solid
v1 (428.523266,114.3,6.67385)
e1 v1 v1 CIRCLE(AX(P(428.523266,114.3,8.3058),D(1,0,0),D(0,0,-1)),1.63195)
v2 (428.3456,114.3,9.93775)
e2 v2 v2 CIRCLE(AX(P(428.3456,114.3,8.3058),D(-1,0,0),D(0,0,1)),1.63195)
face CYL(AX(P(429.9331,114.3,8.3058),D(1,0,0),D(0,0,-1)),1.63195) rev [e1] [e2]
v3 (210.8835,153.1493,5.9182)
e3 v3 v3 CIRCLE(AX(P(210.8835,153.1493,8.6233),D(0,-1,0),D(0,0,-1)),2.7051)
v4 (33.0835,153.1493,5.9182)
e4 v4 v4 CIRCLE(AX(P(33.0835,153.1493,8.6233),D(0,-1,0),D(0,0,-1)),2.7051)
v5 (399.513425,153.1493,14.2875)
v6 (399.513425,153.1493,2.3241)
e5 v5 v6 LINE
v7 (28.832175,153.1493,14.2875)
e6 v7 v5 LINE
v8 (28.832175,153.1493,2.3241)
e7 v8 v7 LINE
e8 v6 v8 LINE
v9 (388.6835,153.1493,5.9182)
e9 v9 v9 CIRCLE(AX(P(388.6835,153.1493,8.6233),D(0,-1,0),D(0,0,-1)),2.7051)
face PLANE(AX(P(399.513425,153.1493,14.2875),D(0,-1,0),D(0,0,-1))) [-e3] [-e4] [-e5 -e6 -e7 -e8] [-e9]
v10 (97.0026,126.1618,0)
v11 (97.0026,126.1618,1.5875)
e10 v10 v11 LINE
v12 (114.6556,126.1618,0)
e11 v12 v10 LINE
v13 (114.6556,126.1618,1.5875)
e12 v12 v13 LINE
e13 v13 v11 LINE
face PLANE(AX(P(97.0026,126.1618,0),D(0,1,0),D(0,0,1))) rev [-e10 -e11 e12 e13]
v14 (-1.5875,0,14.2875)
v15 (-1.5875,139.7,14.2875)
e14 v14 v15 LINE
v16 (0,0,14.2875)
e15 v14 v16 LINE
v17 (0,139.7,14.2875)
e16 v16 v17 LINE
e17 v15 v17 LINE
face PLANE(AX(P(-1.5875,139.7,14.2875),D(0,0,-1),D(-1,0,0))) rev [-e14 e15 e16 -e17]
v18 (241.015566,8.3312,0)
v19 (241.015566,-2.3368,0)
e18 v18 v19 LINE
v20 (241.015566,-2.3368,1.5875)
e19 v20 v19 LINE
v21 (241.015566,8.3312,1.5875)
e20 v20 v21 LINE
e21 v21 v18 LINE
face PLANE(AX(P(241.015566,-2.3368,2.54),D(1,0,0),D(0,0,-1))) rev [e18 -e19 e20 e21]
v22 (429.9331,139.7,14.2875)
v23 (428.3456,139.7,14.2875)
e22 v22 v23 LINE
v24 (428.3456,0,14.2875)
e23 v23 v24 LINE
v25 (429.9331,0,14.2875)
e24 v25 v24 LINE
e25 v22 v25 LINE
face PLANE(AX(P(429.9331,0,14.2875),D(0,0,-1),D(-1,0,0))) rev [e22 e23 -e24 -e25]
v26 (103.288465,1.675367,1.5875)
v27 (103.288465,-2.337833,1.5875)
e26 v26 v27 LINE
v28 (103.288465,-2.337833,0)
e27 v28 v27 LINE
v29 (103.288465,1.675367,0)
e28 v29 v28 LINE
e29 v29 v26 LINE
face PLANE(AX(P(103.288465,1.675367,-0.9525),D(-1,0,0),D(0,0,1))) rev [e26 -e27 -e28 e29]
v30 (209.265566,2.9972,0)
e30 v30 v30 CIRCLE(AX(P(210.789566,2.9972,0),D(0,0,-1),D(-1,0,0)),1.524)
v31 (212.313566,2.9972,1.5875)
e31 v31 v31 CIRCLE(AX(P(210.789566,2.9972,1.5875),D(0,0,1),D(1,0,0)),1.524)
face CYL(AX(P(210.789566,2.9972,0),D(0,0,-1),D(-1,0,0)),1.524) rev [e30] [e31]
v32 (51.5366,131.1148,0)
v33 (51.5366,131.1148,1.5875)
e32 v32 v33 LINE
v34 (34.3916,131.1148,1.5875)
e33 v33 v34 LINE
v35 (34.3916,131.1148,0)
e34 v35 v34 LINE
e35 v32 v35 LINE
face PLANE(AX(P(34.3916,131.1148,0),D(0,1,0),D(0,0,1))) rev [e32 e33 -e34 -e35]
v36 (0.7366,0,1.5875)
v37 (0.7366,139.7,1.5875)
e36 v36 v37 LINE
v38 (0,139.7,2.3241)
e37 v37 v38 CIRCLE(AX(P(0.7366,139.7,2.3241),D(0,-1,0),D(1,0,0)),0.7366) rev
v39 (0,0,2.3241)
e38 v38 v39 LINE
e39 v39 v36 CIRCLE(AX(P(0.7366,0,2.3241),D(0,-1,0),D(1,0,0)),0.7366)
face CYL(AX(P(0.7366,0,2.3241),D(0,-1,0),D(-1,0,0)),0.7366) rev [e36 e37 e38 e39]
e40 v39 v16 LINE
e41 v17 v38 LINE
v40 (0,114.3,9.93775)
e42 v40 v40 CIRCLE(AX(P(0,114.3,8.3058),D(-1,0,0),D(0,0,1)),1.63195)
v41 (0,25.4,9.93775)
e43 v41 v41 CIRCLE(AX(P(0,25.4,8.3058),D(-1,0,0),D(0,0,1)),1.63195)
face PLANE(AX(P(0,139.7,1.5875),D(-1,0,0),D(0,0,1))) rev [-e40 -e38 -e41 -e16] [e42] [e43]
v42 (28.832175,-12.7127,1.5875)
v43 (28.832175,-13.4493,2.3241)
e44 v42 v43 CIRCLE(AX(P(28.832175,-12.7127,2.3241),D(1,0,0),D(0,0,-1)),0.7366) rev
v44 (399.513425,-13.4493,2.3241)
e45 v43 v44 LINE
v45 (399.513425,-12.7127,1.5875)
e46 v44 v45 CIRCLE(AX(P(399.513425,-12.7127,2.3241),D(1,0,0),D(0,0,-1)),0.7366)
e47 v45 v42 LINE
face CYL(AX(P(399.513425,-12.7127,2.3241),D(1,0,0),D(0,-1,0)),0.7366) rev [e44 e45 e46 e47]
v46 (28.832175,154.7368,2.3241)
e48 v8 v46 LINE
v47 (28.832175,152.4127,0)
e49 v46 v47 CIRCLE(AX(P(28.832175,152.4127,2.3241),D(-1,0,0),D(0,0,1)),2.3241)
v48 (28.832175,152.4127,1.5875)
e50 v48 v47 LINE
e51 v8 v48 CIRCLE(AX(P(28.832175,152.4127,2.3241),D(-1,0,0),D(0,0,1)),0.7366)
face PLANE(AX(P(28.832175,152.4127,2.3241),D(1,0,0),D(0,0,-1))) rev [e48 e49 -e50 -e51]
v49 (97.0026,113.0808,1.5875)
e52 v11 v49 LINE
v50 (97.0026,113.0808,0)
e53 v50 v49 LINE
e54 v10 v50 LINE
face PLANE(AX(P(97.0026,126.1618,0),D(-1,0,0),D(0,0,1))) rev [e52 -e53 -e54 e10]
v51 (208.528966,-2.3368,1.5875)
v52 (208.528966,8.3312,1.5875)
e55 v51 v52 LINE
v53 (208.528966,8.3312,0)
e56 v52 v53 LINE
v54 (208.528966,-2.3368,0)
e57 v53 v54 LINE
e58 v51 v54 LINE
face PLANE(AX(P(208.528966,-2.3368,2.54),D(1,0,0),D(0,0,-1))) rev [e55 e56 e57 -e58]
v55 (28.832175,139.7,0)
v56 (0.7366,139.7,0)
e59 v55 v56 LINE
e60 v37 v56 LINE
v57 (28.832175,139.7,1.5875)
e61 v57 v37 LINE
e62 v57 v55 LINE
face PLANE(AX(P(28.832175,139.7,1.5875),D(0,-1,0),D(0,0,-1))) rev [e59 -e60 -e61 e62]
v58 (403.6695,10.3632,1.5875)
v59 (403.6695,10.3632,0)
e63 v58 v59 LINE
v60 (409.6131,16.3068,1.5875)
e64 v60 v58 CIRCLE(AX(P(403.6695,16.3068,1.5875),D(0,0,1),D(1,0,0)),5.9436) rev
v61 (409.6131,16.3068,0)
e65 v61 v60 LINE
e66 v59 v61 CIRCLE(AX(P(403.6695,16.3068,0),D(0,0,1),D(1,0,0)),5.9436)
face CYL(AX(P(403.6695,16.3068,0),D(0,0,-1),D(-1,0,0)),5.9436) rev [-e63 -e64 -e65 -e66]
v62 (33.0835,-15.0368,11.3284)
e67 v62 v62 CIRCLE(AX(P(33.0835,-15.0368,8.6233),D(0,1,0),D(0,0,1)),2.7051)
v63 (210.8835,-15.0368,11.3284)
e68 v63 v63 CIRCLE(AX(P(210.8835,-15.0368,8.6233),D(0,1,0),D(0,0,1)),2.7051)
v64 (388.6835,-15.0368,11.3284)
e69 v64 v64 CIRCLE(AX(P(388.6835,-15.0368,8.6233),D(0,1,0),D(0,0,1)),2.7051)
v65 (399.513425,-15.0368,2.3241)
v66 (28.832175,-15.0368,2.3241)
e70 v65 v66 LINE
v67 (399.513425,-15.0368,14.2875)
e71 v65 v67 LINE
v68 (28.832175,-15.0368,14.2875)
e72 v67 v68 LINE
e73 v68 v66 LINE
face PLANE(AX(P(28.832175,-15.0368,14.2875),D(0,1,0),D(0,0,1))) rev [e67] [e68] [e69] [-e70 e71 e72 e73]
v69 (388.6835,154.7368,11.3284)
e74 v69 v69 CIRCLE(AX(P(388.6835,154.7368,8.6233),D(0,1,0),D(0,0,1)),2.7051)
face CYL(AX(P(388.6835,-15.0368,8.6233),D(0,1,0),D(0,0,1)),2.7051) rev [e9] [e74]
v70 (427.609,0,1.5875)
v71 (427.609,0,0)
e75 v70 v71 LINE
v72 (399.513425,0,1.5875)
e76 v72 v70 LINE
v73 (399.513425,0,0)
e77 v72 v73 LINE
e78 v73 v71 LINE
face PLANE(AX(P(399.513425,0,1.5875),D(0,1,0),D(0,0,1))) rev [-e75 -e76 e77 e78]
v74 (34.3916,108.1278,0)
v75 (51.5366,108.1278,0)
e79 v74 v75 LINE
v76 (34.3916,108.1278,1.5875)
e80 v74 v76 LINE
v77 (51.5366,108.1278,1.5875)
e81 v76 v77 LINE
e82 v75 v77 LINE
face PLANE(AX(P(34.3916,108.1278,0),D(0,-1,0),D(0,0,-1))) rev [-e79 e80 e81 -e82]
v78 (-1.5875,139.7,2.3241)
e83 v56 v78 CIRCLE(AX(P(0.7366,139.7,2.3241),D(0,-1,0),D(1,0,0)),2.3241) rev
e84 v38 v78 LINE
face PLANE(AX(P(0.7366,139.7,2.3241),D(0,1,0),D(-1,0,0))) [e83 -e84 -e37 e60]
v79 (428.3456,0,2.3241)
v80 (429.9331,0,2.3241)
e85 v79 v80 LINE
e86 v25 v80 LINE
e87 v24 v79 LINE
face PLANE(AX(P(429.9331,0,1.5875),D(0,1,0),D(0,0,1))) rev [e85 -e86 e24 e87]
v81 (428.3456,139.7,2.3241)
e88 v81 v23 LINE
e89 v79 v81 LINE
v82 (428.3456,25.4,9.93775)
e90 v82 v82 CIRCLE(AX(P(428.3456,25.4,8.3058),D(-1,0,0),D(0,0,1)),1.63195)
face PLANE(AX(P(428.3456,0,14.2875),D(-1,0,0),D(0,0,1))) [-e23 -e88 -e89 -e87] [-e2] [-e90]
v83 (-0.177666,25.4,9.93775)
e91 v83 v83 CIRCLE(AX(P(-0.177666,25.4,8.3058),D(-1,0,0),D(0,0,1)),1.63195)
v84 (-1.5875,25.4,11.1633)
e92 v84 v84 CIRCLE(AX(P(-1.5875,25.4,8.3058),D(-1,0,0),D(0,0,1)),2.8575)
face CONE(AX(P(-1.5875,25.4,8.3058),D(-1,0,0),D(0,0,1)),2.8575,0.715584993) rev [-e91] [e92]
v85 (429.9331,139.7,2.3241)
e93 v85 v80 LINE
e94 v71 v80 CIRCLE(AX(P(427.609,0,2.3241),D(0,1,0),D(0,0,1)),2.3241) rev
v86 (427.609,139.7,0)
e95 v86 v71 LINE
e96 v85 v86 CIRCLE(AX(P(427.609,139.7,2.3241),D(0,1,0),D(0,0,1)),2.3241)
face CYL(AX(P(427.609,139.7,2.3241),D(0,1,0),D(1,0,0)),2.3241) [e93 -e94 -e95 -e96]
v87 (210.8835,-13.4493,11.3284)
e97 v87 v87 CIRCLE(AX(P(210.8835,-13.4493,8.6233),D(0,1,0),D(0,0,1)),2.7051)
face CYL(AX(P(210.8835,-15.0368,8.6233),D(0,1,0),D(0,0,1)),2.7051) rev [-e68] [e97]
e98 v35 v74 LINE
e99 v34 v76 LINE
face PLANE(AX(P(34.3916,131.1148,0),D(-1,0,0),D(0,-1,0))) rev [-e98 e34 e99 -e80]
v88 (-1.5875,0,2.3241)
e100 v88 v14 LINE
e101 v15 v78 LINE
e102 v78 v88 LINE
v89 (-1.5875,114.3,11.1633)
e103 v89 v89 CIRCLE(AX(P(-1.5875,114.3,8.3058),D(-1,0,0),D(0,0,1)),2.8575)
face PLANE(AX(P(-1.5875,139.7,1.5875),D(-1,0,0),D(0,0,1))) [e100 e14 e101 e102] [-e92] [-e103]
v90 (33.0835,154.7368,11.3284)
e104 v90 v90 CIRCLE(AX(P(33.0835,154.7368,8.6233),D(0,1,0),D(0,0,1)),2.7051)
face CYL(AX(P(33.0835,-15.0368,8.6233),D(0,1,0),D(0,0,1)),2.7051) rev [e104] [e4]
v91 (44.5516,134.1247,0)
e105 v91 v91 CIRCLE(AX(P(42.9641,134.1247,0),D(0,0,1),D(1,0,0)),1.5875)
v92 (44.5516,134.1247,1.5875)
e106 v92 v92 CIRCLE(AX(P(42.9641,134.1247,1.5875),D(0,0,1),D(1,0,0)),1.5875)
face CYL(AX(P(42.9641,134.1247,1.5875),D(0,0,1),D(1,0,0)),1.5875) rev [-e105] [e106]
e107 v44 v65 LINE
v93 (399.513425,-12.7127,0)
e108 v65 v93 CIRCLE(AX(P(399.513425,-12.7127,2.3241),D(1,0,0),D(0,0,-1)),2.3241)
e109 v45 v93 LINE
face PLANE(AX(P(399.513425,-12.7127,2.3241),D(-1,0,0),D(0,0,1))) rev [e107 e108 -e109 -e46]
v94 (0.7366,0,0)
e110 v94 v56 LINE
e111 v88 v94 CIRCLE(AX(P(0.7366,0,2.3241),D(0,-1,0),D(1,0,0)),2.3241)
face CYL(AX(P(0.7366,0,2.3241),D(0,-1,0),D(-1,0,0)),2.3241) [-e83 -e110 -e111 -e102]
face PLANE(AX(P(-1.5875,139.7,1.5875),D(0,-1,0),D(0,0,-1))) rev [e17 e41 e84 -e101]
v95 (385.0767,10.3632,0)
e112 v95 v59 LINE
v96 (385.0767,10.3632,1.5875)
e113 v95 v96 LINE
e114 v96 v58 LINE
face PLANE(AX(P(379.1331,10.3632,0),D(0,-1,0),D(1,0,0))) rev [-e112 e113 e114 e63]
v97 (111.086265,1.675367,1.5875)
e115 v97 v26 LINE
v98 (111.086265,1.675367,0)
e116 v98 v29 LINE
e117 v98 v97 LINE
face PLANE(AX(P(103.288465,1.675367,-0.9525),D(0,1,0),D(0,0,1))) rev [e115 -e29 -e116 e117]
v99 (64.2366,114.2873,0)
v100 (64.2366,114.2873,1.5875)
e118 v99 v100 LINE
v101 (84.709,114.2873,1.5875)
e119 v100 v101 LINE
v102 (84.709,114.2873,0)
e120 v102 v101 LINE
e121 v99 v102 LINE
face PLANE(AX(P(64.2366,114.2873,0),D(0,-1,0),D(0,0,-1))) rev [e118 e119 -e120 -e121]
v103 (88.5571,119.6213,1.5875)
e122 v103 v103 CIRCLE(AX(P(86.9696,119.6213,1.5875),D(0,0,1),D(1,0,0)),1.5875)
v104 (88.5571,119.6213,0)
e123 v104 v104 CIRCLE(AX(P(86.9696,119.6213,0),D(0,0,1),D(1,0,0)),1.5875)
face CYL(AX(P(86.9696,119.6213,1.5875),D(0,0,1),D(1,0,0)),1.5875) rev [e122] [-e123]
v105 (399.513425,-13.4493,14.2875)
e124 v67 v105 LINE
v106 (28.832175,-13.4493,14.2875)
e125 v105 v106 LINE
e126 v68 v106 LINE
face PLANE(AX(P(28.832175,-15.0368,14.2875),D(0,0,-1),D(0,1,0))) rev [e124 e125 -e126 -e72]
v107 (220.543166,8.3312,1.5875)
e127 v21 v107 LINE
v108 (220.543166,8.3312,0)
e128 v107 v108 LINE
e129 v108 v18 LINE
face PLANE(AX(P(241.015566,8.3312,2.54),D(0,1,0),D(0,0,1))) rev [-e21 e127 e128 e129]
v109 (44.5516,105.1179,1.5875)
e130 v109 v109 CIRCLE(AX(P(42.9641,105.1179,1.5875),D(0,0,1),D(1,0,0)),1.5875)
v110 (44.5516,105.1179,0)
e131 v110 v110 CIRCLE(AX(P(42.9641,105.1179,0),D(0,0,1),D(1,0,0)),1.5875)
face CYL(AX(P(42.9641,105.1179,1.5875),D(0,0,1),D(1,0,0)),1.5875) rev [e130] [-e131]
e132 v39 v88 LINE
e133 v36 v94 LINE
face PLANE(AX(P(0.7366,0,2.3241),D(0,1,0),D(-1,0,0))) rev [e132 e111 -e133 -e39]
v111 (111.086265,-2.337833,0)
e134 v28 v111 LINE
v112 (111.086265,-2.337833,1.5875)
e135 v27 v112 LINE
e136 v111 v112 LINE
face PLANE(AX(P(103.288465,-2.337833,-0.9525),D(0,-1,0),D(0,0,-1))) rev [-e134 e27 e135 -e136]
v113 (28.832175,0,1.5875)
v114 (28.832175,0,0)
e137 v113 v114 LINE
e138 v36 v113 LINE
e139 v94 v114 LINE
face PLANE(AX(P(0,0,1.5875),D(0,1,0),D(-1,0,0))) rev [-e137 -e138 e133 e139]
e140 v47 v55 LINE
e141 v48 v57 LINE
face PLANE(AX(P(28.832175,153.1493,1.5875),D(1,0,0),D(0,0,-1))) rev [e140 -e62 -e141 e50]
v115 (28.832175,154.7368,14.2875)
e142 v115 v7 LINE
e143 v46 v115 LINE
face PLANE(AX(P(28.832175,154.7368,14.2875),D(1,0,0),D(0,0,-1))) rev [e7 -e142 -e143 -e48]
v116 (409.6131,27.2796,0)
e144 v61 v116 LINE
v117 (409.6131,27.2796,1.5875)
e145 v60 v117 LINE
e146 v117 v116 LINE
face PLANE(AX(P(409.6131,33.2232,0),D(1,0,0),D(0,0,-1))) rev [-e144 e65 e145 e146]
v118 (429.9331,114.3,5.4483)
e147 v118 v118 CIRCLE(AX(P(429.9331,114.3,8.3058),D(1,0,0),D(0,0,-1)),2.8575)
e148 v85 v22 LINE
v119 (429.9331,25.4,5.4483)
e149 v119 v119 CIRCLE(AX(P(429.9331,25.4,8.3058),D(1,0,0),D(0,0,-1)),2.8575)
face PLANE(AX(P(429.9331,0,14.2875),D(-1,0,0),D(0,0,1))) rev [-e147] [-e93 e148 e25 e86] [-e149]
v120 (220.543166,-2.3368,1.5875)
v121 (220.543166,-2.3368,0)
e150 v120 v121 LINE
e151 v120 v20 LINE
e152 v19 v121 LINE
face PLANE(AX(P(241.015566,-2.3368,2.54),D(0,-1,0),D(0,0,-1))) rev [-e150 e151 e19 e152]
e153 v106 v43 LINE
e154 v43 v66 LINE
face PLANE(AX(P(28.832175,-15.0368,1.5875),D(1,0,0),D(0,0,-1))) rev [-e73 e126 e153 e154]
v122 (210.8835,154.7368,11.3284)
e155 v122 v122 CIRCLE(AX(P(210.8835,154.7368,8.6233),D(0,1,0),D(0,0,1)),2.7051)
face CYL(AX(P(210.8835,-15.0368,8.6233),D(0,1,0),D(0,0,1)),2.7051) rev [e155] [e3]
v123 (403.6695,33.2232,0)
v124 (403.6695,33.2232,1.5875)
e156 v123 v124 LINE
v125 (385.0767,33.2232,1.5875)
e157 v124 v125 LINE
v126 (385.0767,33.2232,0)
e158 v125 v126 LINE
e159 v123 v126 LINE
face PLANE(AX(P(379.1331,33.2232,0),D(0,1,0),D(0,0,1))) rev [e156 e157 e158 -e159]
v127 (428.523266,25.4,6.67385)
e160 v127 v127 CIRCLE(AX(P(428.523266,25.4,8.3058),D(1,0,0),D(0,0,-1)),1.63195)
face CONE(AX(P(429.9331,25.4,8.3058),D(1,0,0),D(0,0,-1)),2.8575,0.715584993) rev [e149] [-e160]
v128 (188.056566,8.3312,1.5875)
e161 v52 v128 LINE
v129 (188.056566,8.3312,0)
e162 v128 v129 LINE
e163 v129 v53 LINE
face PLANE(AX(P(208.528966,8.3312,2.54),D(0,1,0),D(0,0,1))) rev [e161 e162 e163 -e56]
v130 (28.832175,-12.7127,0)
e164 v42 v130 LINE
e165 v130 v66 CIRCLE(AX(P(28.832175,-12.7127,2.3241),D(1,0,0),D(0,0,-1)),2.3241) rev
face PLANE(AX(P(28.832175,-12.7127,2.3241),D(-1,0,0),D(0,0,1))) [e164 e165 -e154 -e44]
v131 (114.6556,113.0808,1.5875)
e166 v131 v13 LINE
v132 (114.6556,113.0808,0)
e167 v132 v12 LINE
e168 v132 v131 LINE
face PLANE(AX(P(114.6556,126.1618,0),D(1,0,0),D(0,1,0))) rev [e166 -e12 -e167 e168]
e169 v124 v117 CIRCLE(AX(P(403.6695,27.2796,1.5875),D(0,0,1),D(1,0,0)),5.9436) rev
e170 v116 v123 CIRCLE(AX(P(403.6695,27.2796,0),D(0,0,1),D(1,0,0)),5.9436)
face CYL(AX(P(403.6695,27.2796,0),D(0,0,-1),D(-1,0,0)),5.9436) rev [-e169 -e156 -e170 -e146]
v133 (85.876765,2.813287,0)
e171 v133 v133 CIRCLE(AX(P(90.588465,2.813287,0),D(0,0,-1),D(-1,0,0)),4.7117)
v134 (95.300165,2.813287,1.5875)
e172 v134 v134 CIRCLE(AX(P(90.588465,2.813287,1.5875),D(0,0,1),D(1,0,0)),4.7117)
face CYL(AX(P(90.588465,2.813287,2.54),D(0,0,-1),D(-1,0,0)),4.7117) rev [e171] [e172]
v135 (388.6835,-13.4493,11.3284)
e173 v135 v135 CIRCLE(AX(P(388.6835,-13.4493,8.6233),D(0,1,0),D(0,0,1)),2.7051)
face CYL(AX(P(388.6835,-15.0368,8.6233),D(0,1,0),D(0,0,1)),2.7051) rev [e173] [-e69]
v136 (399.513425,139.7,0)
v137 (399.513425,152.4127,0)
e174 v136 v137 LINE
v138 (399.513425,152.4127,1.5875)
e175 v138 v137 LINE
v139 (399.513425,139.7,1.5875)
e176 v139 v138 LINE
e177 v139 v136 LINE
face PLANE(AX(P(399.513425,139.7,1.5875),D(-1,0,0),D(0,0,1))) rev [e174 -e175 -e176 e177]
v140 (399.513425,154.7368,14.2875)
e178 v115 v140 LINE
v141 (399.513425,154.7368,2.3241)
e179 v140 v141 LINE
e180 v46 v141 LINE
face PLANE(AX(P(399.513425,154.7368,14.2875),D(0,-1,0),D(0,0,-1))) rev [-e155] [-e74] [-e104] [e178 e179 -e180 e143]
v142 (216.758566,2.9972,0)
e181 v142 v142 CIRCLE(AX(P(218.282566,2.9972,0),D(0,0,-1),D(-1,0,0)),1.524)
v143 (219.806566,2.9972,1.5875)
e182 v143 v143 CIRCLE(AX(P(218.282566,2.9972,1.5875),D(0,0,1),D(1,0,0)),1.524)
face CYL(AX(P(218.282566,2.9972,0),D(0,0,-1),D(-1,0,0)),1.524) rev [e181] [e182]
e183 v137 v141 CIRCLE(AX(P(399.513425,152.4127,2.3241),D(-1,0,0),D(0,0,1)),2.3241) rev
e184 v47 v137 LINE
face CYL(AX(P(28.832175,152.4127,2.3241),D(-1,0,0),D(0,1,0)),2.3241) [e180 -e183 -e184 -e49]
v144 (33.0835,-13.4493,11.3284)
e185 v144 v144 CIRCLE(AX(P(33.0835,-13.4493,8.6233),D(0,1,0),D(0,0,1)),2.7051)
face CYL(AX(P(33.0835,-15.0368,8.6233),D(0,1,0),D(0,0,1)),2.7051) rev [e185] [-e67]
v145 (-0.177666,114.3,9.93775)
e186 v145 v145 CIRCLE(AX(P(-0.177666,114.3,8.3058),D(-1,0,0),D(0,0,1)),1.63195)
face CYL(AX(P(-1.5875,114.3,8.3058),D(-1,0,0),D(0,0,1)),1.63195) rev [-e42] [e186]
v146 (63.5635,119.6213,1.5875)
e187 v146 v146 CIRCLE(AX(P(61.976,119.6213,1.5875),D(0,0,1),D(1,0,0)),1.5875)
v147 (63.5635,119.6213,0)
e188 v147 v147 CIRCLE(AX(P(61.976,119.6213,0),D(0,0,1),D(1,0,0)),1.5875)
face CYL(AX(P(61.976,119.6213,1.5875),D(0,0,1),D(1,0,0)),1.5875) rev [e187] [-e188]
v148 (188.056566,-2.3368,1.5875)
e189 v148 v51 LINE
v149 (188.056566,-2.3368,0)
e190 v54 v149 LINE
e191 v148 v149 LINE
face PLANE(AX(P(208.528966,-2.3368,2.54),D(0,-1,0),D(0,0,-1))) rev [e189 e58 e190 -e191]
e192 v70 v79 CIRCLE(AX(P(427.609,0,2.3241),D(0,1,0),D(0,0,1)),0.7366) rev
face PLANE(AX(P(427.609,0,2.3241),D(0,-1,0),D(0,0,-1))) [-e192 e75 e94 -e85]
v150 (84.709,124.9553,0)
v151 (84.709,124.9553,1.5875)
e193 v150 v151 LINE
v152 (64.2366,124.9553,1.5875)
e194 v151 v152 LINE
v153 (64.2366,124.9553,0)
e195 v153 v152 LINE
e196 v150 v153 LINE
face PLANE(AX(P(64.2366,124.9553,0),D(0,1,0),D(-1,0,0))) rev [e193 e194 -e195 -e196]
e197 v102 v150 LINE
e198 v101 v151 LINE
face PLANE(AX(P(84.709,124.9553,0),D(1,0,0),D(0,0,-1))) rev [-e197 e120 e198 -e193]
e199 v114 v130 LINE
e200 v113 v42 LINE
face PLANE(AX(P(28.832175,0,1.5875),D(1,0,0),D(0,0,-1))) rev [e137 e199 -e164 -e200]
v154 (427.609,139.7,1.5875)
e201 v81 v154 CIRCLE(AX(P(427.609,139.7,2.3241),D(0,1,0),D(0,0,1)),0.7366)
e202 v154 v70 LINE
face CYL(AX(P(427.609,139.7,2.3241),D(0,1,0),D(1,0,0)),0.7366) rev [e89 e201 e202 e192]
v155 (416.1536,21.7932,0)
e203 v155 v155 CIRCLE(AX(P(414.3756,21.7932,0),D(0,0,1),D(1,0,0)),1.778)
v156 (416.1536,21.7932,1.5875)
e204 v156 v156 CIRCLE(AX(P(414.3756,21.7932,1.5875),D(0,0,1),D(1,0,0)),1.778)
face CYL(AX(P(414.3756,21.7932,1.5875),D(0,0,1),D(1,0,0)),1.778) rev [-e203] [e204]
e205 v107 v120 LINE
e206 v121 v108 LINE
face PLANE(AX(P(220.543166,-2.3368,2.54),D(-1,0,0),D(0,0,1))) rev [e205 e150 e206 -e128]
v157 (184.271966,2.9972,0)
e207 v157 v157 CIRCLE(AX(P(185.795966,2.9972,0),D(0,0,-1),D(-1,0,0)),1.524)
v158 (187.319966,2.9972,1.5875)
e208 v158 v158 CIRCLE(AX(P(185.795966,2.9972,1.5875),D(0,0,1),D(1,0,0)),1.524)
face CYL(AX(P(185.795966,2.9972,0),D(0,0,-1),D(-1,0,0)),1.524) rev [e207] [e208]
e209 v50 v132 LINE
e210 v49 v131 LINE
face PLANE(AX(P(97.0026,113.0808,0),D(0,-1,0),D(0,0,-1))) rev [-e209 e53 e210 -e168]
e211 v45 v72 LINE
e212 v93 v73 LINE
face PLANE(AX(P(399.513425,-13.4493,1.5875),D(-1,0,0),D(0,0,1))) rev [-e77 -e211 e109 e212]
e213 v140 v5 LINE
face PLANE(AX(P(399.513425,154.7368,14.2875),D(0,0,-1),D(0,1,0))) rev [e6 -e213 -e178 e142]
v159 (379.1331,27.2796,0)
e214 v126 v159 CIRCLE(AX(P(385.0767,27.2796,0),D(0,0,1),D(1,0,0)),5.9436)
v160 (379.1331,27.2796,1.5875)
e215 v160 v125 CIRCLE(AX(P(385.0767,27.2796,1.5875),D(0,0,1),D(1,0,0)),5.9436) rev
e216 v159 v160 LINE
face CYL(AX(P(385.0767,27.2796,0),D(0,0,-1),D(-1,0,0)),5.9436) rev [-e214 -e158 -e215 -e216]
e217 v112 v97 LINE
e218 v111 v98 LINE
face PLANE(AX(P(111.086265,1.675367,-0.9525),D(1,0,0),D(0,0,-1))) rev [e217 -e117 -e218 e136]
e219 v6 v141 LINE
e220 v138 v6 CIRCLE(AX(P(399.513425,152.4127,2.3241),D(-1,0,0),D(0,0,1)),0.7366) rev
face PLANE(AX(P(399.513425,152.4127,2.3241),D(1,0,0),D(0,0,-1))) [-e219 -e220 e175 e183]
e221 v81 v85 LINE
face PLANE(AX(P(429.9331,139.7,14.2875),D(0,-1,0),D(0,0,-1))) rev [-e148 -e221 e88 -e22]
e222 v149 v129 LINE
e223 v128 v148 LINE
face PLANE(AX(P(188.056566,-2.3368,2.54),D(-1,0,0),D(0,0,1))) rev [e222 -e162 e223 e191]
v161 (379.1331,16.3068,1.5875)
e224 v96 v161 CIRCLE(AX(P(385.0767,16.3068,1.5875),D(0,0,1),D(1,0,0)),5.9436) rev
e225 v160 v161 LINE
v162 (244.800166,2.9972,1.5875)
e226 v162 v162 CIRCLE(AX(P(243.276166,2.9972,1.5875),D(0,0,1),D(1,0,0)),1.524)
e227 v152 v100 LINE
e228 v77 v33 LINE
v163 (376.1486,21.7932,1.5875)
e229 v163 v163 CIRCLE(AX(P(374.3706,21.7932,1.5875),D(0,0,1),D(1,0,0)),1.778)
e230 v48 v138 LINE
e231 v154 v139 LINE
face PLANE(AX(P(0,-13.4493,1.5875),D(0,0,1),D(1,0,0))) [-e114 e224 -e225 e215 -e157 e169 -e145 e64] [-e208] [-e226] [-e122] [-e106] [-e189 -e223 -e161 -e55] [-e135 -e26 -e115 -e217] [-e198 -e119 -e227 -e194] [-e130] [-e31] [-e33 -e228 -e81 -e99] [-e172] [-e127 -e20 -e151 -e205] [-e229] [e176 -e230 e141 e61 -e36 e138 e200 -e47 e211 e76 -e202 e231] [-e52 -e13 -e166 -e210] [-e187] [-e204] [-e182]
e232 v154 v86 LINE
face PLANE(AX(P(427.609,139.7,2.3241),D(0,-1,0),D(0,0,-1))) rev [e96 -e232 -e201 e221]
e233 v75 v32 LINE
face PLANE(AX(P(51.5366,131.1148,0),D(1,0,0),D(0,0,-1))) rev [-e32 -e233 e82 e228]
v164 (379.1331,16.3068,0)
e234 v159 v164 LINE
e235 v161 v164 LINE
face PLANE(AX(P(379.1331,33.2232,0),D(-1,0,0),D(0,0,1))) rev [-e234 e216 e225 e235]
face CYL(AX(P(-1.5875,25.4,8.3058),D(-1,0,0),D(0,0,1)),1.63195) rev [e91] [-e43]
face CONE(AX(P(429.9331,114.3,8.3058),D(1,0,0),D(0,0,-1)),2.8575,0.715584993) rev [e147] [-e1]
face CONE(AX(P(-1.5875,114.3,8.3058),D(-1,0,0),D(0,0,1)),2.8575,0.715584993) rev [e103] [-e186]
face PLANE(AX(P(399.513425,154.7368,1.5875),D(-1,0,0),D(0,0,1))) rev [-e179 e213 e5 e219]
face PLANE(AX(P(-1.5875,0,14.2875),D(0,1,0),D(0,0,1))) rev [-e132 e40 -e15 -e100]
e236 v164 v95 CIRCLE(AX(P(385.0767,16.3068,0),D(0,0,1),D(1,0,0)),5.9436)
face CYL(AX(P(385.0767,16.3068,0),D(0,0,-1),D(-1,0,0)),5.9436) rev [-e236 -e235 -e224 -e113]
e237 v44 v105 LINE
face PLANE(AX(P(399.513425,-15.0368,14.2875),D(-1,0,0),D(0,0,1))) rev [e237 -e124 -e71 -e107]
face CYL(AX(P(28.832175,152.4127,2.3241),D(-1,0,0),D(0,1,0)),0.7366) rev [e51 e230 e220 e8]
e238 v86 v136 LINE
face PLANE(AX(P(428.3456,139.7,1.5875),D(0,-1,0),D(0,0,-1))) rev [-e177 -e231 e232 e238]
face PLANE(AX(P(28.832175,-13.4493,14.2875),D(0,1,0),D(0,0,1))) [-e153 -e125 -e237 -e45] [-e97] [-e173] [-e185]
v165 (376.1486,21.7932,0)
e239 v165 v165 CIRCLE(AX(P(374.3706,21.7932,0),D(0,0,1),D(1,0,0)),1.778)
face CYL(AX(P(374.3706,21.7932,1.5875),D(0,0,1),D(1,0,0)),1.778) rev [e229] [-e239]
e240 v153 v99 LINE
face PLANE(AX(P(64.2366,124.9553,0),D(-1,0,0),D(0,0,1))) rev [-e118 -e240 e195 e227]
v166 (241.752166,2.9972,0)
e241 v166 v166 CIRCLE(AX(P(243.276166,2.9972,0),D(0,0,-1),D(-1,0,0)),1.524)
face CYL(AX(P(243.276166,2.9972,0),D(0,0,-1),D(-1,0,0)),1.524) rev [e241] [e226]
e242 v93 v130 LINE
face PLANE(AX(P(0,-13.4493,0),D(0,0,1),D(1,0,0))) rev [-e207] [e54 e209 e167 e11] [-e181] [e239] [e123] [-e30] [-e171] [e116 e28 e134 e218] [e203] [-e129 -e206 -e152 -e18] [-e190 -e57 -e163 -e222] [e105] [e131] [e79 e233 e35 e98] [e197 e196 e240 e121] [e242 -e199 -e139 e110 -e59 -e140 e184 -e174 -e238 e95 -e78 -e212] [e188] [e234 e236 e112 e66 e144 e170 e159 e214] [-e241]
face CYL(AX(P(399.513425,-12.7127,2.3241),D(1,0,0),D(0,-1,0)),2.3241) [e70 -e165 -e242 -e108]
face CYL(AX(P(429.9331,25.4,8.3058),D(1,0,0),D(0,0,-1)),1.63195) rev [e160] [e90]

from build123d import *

# Parameters (mm, degrees)
BASE_FLANGE_DEPTH               = 1.5875
EDGE_FLANGE1_STRIP_W            = 7.8232
EDGE_FLANGE1_STRIP_H            = 1.5875
EDGE_FLANGE1_STRIP_CUT_DEPTH    = 139.7
EDGE_FLANGE1_DEPTH              = 139.7
EDGE_FLANGE2_STRIP_W            = 7.8232
EDGE_FLANGE2_STRIP_H            = 1.5875
EDGE_FLANGE2_STRIP_CUT_DEPTH    = 139.7
EDGE_FLANGE2_DEPTH              = 139.7
EDGE_FLANGE3_STRIP_W            = 7.8232
EDGE_FLANGE3_STRIP_H            = 1.5875
EDGE_FLANGE3_STRIP_CUT_DEPTH    = 370.68125
EDGE_FLANGE3_DEPTH              = 370.68125
EDGE_FLANGE4_STRIP_W            = 7.8232
EDGE_FLANGE4_STRIP_H            = 1.5875
EDGE_FLANGE4_STRIP_CUT_DEPTH    = 370.68125
EDGE_FLANGE4_DEPTH              = 370.68125
SKETCH15_W                      = 20.4724
SKETCH15_H                      = 10.668
CUT_EXTRUDE1_DEPTH              = 458.107468491
SKETCH16_W                      = 17.653
SKETCH16_H                      = 13.081
CUT_EXTRUDE2_DEPTH              = 458.107468491
F_1_8_0_125_DIAMETER_HOLE1_D    = 3.175
LPATTERN2_COUNT                 = 2
LPATTERN2_PITCH                 = 24.9936
SKETCH20_W                      = 17.145
SKETCH20_H                      = 22.987
CUT_EXTRUDE4_DEPTH              = 458.107468491
F_40_0_098_DIAMETER_HOLE2_D     = 3.175
SKETCH31_W                      = 30.48
SKETCH31_H                      = 22.86
CUT_EXTRUDE5_DEPTH              = 458.107468491
F_40_0_098_DIAMETER_HOLE3_D     = 3.556
F_40_0_098_DIAMETER_HOLE4_D     = 3.556
F_40_0_098_DIAMETER_HOLE4_DEPTH = 1.5875
F_40_0_098_DIAMETER_HOLE4_TIP   = 1.068330181
FILLET1_R                       = 5.9436
SKETCH38_W                      = 20.4724
SKETCH38_H                      = 10.668
CUT_EXTRUDE6_DEPTH              = 2.54
LPATTERN3_COUNT                 = 2
LPATTERN3_PITCH                 = 32.4866
LPATTERN4_COUNT                 = 2
LPATTERN4_PITCH                 = 24.9936
LPATTERN5_COUNT                 = 2
LPATTERN5_PITCH                 = 32.4866
LPATTERN7_COUNT                 = 2
LPATTERN7_PITCH                 = 57.4802
LPATTERN8_COUNT                 = 2
LPATTERN8_PITCH                 = 88.9
SKETCH41_R                      = 4.7117
CUT_EXTRUDE7_DEPTH              = 2.54
SKETCH43_W                      = 7.7978
SKETCH43_H                      = 4.0132
CUT_EXTRUDE8_DEPTH              = 2.54
HOLE1_START                     = -15.0368
HOLE1_OUTLINE_R                 = 2.7051
HOLE1_DEPTH                     = 169.7736
LPATTERN9_COUNT                 = 3
LPATTERN9_PITCH                 = 177.8


# Read off the part's stored shape, not the designer's step: Hole1
# Sheet-metal steps are written as plain solids
with BuildPart() as part:
    # Sketch1 → Base-Flange (new body)
    with BuildSketch(Plane.XY):
        Polygon((0, 0), (28.832175, 0), (28.832175, -13.4493), (399.513425, -13.4493), (399.513425, 0), (428.3456, 0), (428.3456, 139.7), (399.513425, 139.7), (399.513425, 153.1493), (28.832175, 153.1493), (28.832175, 139.7), (0, 139.7), align=None)
    extrude(amount=BASE_FLANGE_DEPTH)

    # Edge-Flange1 strip (across the edge) → Edge-Flange1 strip cut (cut)
    with BuildSketch(Plane(origin=(428.3456, 0, 1.5875), x_dir=(-1, 0, 0), z_dir=(0, 1, 0))):
        with Locations((-3.175, -0.79375)):
            Rectangle(EDGE_FLANGE1_STRIP_W, EDGE_FLANGE1_STRIP_H)
    extrude(amount=EDGE_FLANGE1_STRIP_CUT_DEPTH, mode=Mode.SUBTRACT)

    # Edge-Flange1 section (across the edge) → Edge-Flange1 (add)
    with BuildSketch(Plane(origin=(428.3456, 0, 1.5875), x_dir=(-1, 0, 0), z_dir=(0, 1, 0))):
        with BuildLine():
            Line((-1.5875, 0.7366), (-1.5875, 12.7))
            Line((-1.5875, 12.7), (0, 12.7))
            Line((0, 12.7), (0, 0.7366))
            ThreePointArc((0, 0.7366), (0.215745145, 0.215745145), (0.7366, 0))
            Line((0.7366, 0), (0.7366, -1.5875))
            ThreePointArc((0.7366, -1.5875), (-0.90678687, -0.90678687), (-1.5875, 0.7366))
        make_face()
    extrude(amount=EDGE_FLANGE1_DEPTH)

    # Edge-Flange2 strip (across the edge) → Edge-Flange2 strip cut (cut)
    with BuildSketch(Plane(origin=(0, 139.7, 1.5875), x_dir=(1, 0, 0), z_dir=(0, -1, 0))):
        with Locations((-3.175, -0.79375)):
            Rectangle(EDGE_FLANGE2_STRIP_W, EDGE_FLANGE2_STRIP_H)
    extrude(amount=EDGE_FLANGE2_STRIP_CUT_DEPTH, mode=Mode.SUBTRACT)

    # Edge-Flange2 section (across the edge) → Edge-Flange2 (add)
    with BuildSketch(Plane(origin=(0, 139.7, 1.5875), x_dir=(1, 0, 0), z_dir=(0, -1, 0))):
        with BuildLine():
            Line((-1.5875, 0.7366), (-1.5875, 12.7))
            Line((-1.5875, 12.7), (0, 12.7))
            Line((0, 12.7), (0, 0.7366))
            ThreePointArc((0, 0.7366), (0.215745145, 0.215745145), (0.7366, 0))
            Line((0.7366, 0), (0.7366, -1.5875))
            ThreePointArc((0.7366, -1.5875), (-0.90678687, -0.90678687), (-1.5875, 0.7366))
        make_face()
    extrude(amount=EDGE_FLANGE2_DEPTH)

    # Edge-Flange3 strip (across the edge) → Edge-Flange3 strip cut (cut)
    with BuildSketch(Plane(origin=(399.513425, 153.1493, 1.5875), x_dir=(0, -1, 0), z_dir=(-1, 0, 0))):
        with Locations((-3.175, -0.79375)):
            Rectangle(EDGE_FLANGE3_STRIP_W, EDGE_FLANGE3_STRIP_H)
    extrude(amount=EDGE_FLANGE3_STRIP_CUT_DEPTH, mode=Mode.SUBTRACT)

    # Edge-Flange3 section (across the edge) → Edge-Flange3 (add)
    with BuildSketch(Plane(origin=(399.513425, 153.1493, 1.5875), x_dir=(0, -1, 0), z_dir=(-1, 0, 0))):
        with BuildLine():
            Line((-1.5875, 0.7366), (-1.5875, 12.7))
            Line((-1.5875, 12.7), (0, 12.7))
            Line((0, 12.7), (0, 0.7366))
            ThreePointArc((0, 0.7366), (0.215745145, 0.215745145), (0.7366, 0))
            Line((0.7366, 0), (0.7366, -1.5875))
            ThreePointArc((0.7366, -1.5875), (-0.90678687, -0.90678687), (-1.5875, 0.7366))
        make_face()
    extrude(amount=EDGE_FLANGE3_DEPTH)

    # Edge-Flange4 strip (across the edge) → Edge-Flange4 strip cut (cut)
    with BuildSketch(Plane(origin=(28.832175, -13.4493, 1.5875), x_dir=(0, 1, 0), z_dir=(1, 0, 0))):
        with Locations((-3.175, -0.79375)):
            Rectangle(EDGE_FLANGE4_STRIP_W, EDGE_FLANGE4_STRIP_H)
    extrude(amount=EDGE_FLANGE4_STRIP_CUT_DEPTH, mode=Mode.SUBTRACT)

    # Edge-Flange4 section (across the edge) → Edge-Flange4 (add)
    with BuildSketch(Plane(origin=(28.832175, -13.4493, 1.5875), x_dir=(0, 1, 0), z_dir=(1, 0, 0))):
        with BuildLine():
            Line((-1.5875, 0.7366), (-1.5875, 12.7))
            Line((-1.5875, 12.7), (0, 12.7))
            Line((0, 12.7), (0, 0.7366))
            ThreePointArc((0, 0.7366), (0.215745145, 0.215745145), (0.7366, 0))
            Line((0.7366, 0), (0.7366, -1.5875))
            ThreePointArc((0.7366, -1.5875), (-0.90678687, -0.90678687), (-1.5875, 0.7366))
        make_face()
    extrude(amount=EDGE_FLANGE4_DEPTH)

    # Sketch15 → Cut-Extrude1 (cut, through all)
    with BuildSketch(Plane.XY.offset(1.5875)):
        with Locations((74.4728, 119.6213)):
            Rectangle(SKETCH15_W, SKETCH15_H)
    extrude(amount=-CUT_EXTRUDE1_DEPTH, mode=Mode.SUBTRACT)

    # Sketch16 → Cut-Extrude2 (cut, through all)
    with BuildSketch(Plane.XY.offset(1.5875)):
        with Locations((105.8291, 119.6213)):
            Rectangle(SKETCH16_W, SKETCH16_H)
    extrude(amount=-CUT_EXTRUDE2_DEPTH, mode=Mode.SUBTRACT)

    # 1/8 (0.125) Diameter Hole1 (through all)
    with Locations(Plane.XY.offset(1.5875)):
        with Locations((61.976, 119.6213)):
            f_1_8_0_125_diameter_hole1 = Hole(F_1_8_0_125_DIAMETER_HOLE1_D / 2)

    # LPattern2: 1/8 (0.125) Diameter Hole1 ×2
    with Locations(*[(i * LPATTERN2_PITCH, 0, 0) for i in range(1, LPATTERN2_COUNT)]):
        add(f_1_8_0_125_diameter_hole1, mode=Mode.SUBTRACT)

    # Sketch20 → Cut-Extrude4 (cut, through all)
    with BuildSketch(Plane.XY.offset(1.5875)):
        with Locations((42.9641, 119.6213)):
            Rectangle(SKETCH20_W, SKETCH20_H)
    extrude(amount=-CUT_EXTRUDE4_DEPTH, mode=Mode.SUBTRACT)

    # #40 (0.098) Diameter Hole2 (through all)
    with Locations(Plane.XY.offset(1.5875)):
        with Locations((42.9641, 134.1247), (42.9641, 105.1179)):
            Hole(F_40_0_098_DIAMETER_HOLE2_D / 2)

    # Sketch31 → Cut-Extrude5 (cut, through all)
    with BuildSketch(Plane.XY.offset(1.5875)):
        with Locations((394.3731, 21.7932)):
            Rectangle(SKETCH31_W, SKETCH31_H)
    extrude(amount=-CUT_EXTRUDE5_DEPTH, mode=Mode.SUBTRACT)

    # #40 (0.098) Diameter Hole3 (through all)
    with Locations(Plane(origin=(374.3706, 21.7932, 1.5875), x_dir=(1, 0, 0), z_dir=(0, 0, 1))):
        with Locations((0, 0)):
            Hole(F_40_0_098_DIAMETER_HOLE3_D / 2)

    # #40 (0.098) Diameter Hole4
    with Locations(Plane.XY.offset(1.5875)):
        with Locations((414.3756, 21.7932)):
            Hole(F_40_0_098_DIAMETER_HOLE4_D / 2, depth=F_40_0_098_DIAMETER_HOLE4_DEPTH)
            with Locations((0, 0, -(F_40_0_098_DIAMETER_HOLE4_DEPTH + F_40_0_098_DIAMETER_HOLE4_TIP / 2))):  # 118° drill point
                Cone(0, F_40_0_098_DIAMETER_HOLE4_D / 2, F_40_0_098_DIAMETER_HOLE4_TIP, mode=Mode.SUBTRACT)

    # Fillet1
    fillet1_edges = [part.edges().sort_by_distance(p)[0] for p in [
        (379.1331, 10.3632, 0.79375),
        (379.1331, 33.2232, 0.79375),
        (409.6131, 33.2232, 0.79375),
        (409.6131, 10.3632, 0.79375),
    ]]
    fillet(fillet1_edges, radius=FILLET1_R)

    # Sketch38 → Cut-Extrude6 (cut)
    with BuildSketch(Plane(origin=(0, 0, 0), x_dir=(-1, 0, 0), z_dir=(0, 0, -1))):
        with Locations((-230.779365766, 2.9972)):
            Rectangle(SKETCH38_W, SKETCH38_H)
    cut_extrude6 = extrude(amount=-CUT_EXTRUDE6_DEPTH, mode=Mode.SUBTRACT)

    # LPattern3: Cut-Extrude6 ×2
    with Locations(*[(-i * LPATTERN3_PITCH, 0, 0) for i in range(1, LPATTERN3_COUNT)]):
        add(cut_extrude6, mode=Mode.SUBTRACT)

    # Sketch39 → #40 (0.098) Diameter Hole5 (revolve, cut)
    with BuildSketch(Plane(origin=(243.276165766, 2.9972, 0), x_dir=(0, 1, 0), z_dir=(1, 0, 0))):
        Polygon((0, 0), (0, 4.090711583), (1.524, 3.175), (1.524, 0), align=None)
    f_40_0_098_diameter_hole5 = revolve(axis=Axis((243.276165766, 2.9972, -6.35), (0, 0, 1)), mode=Mode.SUBTRACT)

    # LPattern4: #40 (0.098) Diameter Hole5 ×2
    with Locations(*[(-i * LPATTERN4_PITCH, 0, 0) for i in range(1, LPATTERN4_COUNT)]):
        add(f_40_0_098_diameter_hole5, mode=Mode.SUBTRACT)

    # LPattern5: #40 (0.098) Diameter Hole5 ×2
    with Locations(*[(-i * LPATTERN5_PITCH, 0, 0) for i in range(1, LPATTERN5_COUNT)]):
        add(f_40_0_098_diameter_hole5, mode=Mode.SUBTRACT)

    # LPattern7: #40 (0.098) Diameter Hole5 ×2
    with Locations(*[(-i * LPATTERN7_PITCH, 0, 0) for i in range(1, LPATTERN7_COUNT)]):
        add(f_40_0_098_diameter_hole5, mode=Mode.SUBTRACT)

    # Sketch42 → CSK for #4 Flat Head Machine Screw1 (revolve, cut)
    with BuildSketch(Plane(origin=(429.9331, 114.3, 8.3058), x_dir=(0, 0, -1), z_dir=(0, 1, 0))):
        Polygon((0, 0), (0, 1.5885), (1.63195, 1.5885), (1.63195, 1.409834001), (2.8575, 0), align=None)
    csk_for_4_flat_head_machine_screw1 = revolve(axis=Axis((436.2831, 114.3, 8.3058), (-1, 0, 0)), mode=Mode.SUBTRACT)

    # LPattern8: CSK for #4 Flat Head Machine Screw1 ×2
    with Locations(*[(0, -i * LPATTERN8_PITCH, 0) for i in range(1, LPATTERN8_COUNT)]):
        add(csk_for_4_flat_head_machine_screw1, mode=Mode.SUBTRACT)

    # Mirror1: CSK for #4 Flat Head Machine Screw1 across plane
    add(csk_for_4_flat_head_machine_screw1.mirror(Plane.ZY.offset(-214.1728)), mode=Mode.SUBTRACT)

    # Mirror1 copy 1 sketch → Mirror1 copy 1 (revolve, cut)
    with BuildSketch(Plane(origin=(-1.5875, 25.4, 8.3058), x_dir=(0, 0, -1), z_dir=(0, 1, 0))):
        Polygon((0, 0), (0, -1.5885), (1.63195, -1.5885), (1.63195, -1.409834001), (2.8575, 0), align=None)
    revolve(axis=Axis((-7.9375, 25.4, 8.3058), (-1, 0, 0)), mode=Mode.SUBTRACT)

    # Sketch41 → Cut-Extrude7 (cut)
    with BuildSketch(Plane(origin=(0, 0, 0), x_dir=(-1, 0, 0), z_dir=(0, 0, -1))):
        with Locations((-90.588465, 2.813286828)):
            Circle(SKETCH41_R)
    extrude(amount=-CUT_EXTRUDE7_DEPTH, mode=Mode.SUBTRACT)

    # Sketch43 → Cut-Extrude8 (cut)
    with BuildSketch(Plane.XY.offset(1.5875)):
        with Locations((107.187365, -0.331233172)):
            Rectangle(SKETCH43_W, SKETCH43_H)
    extrude(amount=-CUT_EXTRUDE8_DEPTH, mode=Mode.SUBTRACT)

    # Hole1 outline → Hole1 (cut)
    with BuildSketch(Plane(origin=(0, 0, 0), x_dir=(1, 0, 0), z_dir=(0, 1, 0)).offset(HOLE1_START)):
        with Locations((33.0835, -8.6233)):
            Circle(HOLE1_OUTLINE_R)
    hole1 = extrude(amount=HOLE1_DEPTH, mode=Mode.SUBTRACT)

    # LPattern9: Hole1 ×3
    with Locations(*[(i * LPATTERN9_PITCH, 0, 0) for i in range(1, LPATTERN9_COUNT)]):
        add(hole1, mode=Mode.SUBTRACT)


solid = part.part
